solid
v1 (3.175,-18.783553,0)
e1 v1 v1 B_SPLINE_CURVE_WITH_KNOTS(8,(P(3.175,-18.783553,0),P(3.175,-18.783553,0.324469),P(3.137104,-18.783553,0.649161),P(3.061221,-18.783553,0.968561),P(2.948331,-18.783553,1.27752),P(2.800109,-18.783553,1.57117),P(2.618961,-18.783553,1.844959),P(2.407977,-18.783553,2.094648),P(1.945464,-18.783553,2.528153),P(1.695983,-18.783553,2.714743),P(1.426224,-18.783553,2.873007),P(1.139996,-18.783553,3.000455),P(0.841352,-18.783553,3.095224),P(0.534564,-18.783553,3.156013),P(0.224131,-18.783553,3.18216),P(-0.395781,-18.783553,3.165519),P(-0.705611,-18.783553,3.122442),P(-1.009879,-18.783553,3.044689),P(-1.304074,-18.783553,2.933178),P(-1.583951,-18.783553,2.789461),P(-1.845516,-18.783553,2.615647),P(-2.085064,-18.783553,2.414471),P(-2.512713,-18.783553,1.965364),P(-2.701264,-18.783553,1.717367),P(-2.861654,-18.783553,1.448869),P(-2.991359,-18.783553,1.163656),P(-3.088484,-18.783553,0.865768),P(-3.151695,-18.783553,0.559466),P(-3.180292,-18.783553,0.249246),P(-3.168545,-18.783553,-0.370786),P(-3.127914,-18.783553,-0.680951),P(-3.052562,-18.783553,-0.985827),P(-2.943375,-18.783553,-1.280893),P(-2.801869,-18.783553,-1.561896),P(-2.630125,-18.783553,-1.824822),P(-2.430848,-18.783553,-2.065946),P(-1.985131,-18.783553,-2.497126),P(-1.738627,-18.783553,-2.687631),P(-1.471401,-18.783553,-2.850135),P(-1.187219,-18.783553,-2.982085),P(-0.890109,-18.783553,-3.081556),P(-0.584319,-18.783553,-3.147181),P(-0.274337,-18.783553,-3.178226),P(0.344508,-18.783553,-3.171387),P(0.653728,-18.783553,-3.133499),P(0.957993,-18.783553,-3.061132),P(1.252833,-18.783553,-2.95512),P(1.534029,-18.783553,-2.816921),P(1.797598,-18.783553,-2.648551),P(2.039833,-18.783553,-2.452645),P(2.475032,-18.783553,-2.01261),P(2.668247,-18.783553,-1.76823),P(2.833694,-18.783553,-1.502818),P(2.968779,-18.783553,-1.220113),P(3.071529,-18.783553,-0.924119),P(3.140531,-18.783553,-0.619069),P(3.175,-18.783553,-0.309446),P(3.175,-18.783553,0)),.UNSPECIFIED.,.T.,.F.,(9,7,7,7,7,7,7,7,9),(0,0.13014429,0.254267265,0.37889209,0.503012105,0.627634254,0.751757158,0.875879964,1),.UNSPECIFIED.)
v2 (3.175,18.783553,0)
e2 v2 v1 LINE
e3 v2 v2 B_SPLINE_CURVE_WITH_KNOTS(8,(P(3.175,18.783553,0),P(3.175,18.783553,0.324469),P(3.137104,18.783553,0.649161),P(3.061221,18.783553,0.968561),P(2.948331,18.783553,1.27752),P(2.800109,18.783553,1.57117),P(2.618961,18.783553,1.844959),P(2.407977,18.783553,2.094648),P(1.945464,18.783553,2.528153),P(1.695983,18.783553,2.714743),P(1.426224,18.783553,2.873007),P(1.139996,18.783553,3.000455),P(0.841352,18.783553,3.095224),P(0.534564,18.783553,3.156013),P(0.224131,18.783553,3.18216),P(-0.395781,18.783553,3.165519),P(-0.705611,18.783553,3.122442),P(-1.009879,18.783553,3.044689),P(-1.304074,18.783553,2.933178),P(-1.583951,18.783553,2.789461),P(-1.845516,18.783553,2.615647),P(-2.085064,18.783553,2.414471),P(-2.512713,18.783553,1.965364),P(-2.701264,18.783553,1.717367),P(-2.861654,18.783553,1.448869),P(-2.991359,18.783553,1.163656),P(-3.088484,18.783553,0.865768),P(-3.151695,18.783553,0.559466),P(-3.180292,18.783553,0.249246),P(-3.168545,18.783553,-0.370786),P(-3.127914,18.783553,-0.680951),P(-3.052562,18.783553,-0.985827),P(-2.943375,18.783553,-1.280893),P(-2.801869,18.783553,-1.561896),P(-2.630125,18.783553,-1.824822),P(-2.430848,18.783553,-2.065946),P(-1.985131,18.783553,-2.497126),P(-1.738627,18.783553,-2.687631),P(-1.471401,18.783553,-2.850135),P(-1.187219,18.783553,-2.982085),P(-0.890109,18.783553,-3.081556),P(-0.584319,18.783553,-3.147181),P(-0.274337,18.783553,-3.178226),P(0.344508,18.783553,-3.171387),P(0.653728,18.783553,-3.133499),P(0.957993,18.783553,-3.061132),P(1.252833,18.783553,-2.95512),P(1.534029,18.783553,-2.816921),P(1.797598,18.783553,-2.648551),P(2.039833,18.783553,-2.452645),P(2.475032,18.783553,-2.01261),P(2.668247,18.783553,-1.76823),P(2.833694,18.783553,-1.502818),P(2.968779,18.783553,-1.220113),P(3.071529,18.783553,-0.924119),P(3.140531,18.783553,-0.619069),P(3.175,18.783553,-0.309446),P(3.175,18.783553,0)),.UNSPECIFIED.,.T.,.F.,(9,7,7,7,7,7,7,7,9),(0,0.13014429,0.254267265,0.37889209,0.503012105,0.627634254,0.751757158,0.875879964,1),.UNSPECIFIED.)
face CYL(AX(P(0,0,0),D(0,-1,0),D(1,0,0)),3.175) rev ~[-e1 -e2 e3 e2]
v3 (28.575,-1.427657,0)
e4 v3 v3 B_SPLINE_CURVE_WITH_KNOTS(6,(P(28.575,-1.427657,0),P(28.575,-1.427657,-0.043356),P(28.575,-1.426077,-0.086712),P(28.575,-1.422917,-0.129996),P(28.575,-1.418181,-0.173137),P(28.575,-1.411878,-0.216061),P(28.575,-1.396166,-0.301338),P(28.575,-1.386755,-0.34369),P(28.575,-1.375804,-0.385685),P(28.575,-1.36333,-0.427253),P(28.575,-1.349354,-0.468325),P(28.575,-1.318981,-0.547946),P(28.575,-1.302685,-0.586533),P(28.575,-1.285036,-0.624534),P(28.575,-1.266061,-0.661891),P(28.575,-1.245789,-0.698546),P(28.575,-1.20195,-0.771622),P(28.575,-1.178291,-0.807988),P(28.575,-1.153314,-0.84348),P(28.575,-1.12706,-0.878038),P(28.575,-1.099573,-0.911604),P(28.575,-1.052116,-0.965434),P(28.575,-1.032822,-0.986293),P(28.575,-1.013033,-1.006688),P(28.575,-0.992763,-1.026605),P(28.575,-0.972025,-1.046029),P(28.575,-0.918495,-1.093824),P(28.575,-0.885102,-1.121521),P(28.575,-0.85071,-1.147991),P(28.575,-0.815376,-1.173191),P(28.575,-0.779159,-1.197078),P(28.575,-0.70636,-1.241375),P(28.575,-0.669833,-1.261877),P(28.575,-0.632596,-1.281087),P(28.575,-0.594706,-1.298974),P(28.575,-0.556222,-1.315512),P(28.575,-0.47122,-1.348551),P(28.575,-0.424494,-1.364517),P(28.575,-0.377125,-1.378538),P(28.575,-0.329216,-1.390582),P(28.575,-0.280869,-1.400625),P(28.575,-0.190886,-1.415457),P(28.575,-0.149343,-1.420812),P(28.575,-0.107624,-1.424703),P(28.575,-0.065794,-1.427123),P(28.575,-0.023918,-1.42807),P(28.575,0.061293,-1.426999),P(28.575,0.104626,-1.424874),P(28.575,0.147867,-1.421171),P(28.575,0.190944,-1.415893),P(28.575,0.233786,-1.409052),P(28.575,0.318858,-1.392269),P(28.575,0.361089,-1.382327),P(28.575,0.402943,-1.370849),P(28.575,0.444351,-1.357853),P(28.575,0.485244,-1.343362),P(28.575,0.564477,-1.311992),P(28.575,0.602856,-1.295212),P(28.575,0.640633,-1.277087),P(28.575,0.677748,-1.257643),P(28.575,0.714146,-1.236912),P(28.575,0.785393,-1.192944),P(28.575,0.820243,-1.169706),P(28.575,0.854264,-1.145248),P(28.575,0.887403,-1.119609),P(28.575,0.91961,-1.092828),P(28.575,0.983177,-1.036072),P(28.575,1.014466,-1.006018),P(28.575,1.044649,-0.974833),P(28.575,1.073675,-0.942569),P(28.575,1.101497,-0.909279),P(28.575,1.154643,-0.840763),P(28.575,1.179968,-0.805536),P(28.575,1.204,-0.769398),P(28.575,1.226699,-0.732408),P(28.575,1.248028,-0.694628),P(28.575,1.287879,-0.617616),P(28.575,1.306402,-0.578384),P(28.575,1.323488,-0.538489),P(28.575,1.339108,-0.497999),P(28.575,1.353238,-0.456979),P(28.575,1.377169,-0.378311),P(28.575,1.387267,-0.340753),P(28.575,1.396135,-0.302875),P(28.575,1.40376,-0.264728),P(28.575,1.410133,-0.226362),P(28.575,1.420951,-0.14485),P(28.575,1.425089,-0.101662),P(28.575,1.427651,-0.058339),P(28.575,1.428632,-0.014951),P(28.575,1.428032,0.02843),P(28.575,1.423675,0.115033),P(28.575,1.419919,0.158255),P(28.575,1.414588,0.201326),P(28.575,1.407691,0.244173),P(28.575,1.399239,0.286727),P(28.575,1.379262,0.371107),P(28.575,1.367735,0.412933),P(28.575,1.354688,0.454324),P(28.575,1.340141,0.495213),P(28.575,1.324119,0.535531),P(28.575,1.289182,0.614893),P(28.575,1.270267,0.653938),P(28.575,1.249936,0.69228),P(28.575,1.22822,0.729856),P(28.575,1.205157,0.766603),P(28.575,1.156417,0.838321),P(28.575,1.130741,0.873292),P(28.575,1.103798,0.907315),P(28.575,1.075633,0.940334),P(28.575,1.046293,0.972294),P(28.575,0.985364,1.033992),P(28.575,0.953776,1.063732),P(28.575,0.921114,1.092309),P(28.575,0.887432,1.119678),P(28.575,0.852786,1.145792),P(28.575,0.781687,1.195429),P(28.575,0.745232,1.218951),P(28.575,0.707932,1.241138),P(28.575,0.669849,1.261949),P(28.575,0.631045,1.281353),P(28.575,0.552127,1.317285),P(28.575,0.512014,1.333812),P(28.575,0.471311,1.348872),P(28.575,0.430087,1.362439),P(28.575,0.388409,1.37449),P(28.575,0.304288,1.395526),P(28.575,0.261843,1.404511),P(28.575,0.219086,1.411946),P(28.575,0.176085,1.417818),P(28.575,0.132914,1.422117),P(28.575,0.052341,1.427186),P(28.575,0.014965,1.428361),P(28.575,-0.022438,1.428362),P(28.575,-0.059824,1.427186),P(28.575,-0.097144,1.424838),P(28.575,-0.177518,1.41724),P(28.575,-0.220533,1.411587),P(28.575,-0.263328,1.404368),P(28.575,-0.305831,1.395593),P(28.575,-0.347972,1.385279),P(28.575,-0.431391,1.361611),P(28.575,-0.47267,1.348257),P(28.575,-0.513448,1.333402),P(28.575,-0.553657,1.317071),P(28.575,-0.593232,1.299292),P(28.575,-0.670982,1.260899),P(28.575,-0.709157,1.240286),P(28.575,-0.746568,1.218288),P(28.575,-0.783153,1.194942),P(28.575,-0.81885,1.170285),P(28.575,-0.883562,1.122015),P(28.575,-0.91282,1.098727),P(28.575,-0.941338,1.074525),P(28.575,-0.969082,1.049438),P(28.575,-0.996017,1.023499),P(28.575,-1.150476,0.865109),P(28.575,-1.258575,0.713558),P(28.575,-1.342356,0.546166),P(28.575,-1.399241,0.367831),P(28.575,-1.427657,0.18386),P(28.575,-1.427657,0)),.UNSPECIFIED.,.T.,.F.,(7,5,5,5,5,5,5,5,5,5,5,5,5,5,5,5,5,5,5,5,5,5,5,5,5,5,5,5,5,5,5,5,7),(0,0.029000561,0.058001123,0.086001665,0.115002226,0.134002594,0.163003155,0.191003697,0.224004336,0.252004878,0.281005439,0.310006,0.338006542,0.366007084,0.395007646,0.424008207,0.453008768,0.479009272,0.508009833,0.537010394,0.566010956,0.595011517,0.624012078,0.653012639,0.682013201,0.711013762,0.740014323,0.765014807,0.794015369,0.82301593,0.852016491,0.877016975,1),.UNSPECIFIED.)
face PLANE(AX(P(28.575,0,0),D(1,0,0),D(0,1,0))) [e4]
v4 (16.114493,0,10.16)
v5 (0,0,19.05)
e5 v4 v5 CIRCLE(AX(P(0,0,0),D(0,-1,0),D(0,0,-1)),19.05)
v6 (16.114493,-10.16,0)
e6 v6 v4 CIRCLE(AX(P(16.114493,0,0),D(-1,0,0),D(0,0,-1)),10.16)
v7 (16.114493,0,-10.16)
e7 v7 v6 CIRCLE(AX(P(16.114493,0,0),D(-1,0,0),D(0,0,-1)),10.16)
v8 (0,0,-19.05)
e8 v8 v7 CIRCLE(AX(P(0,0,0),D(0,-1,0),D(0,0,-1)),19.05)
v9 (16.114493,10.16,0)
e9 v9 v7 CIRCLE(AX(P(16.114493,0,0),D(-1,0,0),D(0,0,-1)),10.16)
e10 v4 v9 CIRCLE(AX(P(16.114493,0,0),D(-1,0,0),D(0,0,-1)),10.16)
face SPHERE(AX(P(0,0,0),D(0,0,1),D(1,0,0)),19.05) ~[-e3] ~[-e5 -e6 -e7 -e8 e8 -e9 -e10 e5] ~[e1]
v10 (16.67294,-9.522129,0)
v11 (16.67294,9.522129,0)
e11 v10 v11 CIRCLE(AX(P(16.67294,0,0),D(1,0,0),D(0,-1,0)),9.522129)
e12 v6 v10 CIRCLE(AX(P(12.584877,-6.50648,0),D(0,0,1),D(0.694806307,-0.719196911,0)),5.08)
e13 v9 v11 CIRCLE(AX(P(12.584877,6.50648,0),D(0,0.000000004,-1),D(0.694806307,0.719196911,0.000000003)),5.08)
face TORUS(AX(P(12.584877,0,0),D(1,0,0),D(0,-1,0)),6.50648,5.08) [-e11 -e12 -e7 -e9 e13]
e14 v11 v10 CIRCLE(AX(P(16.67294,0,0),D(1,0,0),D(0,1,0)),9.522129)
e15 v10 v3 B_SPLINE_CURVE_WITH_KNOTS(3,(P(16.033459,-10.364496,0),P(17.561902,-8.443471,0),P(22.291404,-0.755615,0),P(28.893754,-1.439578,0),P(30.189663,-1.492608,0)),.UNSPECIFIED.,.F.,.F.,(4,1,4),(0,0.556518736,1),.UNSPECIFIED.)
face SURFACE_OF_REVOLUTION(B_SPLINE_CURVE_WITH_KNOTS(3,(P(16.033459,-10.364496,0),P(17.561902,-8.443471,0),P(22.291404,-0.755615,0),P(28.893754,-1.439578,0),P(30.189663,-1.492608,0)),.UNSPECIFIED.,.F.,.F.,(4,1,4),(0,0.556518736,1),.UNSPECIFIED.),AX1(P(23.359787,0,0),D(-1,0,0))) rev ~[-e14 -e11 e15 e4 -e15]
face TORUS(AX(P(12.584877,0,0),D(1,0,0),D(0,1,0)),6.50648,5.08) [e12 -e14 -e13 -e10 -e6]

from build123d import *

# Parameters (mm, degrees)
F3_R        = 10.16
F4_DEPTH    = 15.875
F7_R        = 3.175
F8_DEPTH    = 25.4
F9_T2_ANGLE = 180.0000002199
F9_T4_ANGLE = 179.9999999345


# Not quite as in the source:
# - a fillet or chamfer that OpenCascade refuses, or shapes differently, is made with other operations: its cross-section is extruded or revolved along the edge and cut away or added


with BuildPart() as f1:
    # F0 (on Front) → F1 (revolve)
    with BuildSketch(Plane.XZ):
        with BuildLine():
            Line((0, 19.05), (0, -19.05))
            ThreePointArc((0, -19.05), (19.05, 0), (0, 19.05))
        make_face()
    revolve(axis=Axis((0, 0, 0), (0, 0, -1)))

    # F3 (on offset) → F4 (join)
    with BuildSketch(Plane.YZ.offset(12.7)):
        Circle(F3_R)
    extrude(amount=F4_DEPTH)

    # F5 (on Top) → F6 (revolve, cut)
    with BuildSketch(Plane.XY):
        with BuildLine():
            add(Edge.make_bspline(
                [(16.0334594548, -10.3644961491), (17.5619016312, -8.4434705035), (22.291404173, -0.7556150252), (28.8937536319, -1.4395783264), (30.1896631718, -1.4926075237)],
                knots=[0, 0, 0, 0, 0.5565187358, 1, 1, 1, 1], degree=3))
            Line((16.0334594548, -10.3644961491), (30.1896631718, -10.3644961491))
            Line((30.1896631718, -10.3644961491), (30.1896631718, -1.4926075237))
        make_face()
    revolve(axis=Axis((23.3597867191, 0, 0), (-1, 0, 0)), mode=Mode.SUBTRACT)

    # F7 (on Front) → F8 (cut, symmetric)
    with BuildSketch(Plane.XZ):
        Circle(F7_R)
    extrude(amount=F8_DEPTH, both=True, mode=Mode.SUBTRACT)

    # F9: fillet of radius 5.08 on 2 edges, made by hand

    # F9_s1 → F9_t2 (revolve, cut)
    with BuildSketch(Plane.XY.offset(-1.95e-08)):
        with BuildLine():
            ThreePointArc((16.1144934764, -10.1599999963), (16.407046723, -9.8527346061), (16.6729403711, -9.5221291161))
            Line((16.6729403711, -9.5221291161), (16.7547016298, -9.5824421047))
            ThreePointArc((16.7547016298, -9.5824421047), (16.5162775071, -9.9033020934), (16.2740232311, -10.2220962285))
            Line((16.2740232311, -10.2220962285), (16.1936079439, -10.2616))
            ThreePointArc((16.1936079439, -10.2616), (16.1540507101, -10.2615999963), (16.1850857971, -10.2330704024))
            Line((16.1850857971, -10.2330704024), (16.1144934764, -10.1599999963))
        make_face()
    revolve(axis=Axis((16.1936079439, -1.58e-08, -1.95e-08), (1, 0, 0)), revolution_arc=F9_T2_ANGLE, mode=Mode.SUBTRACT)

    # F9_s3 → F9_t4 (revolve, cut)
    with BuildSketch(Plane.XY.offset(-5.8e-09)):
        with BuildLine():
            ThreePointArc((16.1144934764, 10.1600000025), (16.407046723, 9.8527346123), (16.6729403711, 9.5221291223))
            Line((16.6729403711, 9.5221291223), (16.7547016298, 9.5824421109))
            ThreePointArc((16.7547016298, 9.5824421109), (16.5162775086, 9.9033020976), (16.2740232311, 10.2220962285))
            Line((16.2740232311, 10.2220962285), (16.1936079439, 10.2616))
            ThreePointArc((16.1936079439, 10.2616), (16.1540507101, 10.2616000025), (16.1850857971, 10.2330704086))
            Line((16.1850857971, 10.2330704086), (16.1144934764, 10.1600000025))
        make_face()
    revolve(axis=Axis((16.1936079439, -3.3e-09, -5.8e-09), (1, 0, 0)), revolution_arc=F9_T4_ANGLE, mode=Mode.SUBTRACT)


solid = f1.part
